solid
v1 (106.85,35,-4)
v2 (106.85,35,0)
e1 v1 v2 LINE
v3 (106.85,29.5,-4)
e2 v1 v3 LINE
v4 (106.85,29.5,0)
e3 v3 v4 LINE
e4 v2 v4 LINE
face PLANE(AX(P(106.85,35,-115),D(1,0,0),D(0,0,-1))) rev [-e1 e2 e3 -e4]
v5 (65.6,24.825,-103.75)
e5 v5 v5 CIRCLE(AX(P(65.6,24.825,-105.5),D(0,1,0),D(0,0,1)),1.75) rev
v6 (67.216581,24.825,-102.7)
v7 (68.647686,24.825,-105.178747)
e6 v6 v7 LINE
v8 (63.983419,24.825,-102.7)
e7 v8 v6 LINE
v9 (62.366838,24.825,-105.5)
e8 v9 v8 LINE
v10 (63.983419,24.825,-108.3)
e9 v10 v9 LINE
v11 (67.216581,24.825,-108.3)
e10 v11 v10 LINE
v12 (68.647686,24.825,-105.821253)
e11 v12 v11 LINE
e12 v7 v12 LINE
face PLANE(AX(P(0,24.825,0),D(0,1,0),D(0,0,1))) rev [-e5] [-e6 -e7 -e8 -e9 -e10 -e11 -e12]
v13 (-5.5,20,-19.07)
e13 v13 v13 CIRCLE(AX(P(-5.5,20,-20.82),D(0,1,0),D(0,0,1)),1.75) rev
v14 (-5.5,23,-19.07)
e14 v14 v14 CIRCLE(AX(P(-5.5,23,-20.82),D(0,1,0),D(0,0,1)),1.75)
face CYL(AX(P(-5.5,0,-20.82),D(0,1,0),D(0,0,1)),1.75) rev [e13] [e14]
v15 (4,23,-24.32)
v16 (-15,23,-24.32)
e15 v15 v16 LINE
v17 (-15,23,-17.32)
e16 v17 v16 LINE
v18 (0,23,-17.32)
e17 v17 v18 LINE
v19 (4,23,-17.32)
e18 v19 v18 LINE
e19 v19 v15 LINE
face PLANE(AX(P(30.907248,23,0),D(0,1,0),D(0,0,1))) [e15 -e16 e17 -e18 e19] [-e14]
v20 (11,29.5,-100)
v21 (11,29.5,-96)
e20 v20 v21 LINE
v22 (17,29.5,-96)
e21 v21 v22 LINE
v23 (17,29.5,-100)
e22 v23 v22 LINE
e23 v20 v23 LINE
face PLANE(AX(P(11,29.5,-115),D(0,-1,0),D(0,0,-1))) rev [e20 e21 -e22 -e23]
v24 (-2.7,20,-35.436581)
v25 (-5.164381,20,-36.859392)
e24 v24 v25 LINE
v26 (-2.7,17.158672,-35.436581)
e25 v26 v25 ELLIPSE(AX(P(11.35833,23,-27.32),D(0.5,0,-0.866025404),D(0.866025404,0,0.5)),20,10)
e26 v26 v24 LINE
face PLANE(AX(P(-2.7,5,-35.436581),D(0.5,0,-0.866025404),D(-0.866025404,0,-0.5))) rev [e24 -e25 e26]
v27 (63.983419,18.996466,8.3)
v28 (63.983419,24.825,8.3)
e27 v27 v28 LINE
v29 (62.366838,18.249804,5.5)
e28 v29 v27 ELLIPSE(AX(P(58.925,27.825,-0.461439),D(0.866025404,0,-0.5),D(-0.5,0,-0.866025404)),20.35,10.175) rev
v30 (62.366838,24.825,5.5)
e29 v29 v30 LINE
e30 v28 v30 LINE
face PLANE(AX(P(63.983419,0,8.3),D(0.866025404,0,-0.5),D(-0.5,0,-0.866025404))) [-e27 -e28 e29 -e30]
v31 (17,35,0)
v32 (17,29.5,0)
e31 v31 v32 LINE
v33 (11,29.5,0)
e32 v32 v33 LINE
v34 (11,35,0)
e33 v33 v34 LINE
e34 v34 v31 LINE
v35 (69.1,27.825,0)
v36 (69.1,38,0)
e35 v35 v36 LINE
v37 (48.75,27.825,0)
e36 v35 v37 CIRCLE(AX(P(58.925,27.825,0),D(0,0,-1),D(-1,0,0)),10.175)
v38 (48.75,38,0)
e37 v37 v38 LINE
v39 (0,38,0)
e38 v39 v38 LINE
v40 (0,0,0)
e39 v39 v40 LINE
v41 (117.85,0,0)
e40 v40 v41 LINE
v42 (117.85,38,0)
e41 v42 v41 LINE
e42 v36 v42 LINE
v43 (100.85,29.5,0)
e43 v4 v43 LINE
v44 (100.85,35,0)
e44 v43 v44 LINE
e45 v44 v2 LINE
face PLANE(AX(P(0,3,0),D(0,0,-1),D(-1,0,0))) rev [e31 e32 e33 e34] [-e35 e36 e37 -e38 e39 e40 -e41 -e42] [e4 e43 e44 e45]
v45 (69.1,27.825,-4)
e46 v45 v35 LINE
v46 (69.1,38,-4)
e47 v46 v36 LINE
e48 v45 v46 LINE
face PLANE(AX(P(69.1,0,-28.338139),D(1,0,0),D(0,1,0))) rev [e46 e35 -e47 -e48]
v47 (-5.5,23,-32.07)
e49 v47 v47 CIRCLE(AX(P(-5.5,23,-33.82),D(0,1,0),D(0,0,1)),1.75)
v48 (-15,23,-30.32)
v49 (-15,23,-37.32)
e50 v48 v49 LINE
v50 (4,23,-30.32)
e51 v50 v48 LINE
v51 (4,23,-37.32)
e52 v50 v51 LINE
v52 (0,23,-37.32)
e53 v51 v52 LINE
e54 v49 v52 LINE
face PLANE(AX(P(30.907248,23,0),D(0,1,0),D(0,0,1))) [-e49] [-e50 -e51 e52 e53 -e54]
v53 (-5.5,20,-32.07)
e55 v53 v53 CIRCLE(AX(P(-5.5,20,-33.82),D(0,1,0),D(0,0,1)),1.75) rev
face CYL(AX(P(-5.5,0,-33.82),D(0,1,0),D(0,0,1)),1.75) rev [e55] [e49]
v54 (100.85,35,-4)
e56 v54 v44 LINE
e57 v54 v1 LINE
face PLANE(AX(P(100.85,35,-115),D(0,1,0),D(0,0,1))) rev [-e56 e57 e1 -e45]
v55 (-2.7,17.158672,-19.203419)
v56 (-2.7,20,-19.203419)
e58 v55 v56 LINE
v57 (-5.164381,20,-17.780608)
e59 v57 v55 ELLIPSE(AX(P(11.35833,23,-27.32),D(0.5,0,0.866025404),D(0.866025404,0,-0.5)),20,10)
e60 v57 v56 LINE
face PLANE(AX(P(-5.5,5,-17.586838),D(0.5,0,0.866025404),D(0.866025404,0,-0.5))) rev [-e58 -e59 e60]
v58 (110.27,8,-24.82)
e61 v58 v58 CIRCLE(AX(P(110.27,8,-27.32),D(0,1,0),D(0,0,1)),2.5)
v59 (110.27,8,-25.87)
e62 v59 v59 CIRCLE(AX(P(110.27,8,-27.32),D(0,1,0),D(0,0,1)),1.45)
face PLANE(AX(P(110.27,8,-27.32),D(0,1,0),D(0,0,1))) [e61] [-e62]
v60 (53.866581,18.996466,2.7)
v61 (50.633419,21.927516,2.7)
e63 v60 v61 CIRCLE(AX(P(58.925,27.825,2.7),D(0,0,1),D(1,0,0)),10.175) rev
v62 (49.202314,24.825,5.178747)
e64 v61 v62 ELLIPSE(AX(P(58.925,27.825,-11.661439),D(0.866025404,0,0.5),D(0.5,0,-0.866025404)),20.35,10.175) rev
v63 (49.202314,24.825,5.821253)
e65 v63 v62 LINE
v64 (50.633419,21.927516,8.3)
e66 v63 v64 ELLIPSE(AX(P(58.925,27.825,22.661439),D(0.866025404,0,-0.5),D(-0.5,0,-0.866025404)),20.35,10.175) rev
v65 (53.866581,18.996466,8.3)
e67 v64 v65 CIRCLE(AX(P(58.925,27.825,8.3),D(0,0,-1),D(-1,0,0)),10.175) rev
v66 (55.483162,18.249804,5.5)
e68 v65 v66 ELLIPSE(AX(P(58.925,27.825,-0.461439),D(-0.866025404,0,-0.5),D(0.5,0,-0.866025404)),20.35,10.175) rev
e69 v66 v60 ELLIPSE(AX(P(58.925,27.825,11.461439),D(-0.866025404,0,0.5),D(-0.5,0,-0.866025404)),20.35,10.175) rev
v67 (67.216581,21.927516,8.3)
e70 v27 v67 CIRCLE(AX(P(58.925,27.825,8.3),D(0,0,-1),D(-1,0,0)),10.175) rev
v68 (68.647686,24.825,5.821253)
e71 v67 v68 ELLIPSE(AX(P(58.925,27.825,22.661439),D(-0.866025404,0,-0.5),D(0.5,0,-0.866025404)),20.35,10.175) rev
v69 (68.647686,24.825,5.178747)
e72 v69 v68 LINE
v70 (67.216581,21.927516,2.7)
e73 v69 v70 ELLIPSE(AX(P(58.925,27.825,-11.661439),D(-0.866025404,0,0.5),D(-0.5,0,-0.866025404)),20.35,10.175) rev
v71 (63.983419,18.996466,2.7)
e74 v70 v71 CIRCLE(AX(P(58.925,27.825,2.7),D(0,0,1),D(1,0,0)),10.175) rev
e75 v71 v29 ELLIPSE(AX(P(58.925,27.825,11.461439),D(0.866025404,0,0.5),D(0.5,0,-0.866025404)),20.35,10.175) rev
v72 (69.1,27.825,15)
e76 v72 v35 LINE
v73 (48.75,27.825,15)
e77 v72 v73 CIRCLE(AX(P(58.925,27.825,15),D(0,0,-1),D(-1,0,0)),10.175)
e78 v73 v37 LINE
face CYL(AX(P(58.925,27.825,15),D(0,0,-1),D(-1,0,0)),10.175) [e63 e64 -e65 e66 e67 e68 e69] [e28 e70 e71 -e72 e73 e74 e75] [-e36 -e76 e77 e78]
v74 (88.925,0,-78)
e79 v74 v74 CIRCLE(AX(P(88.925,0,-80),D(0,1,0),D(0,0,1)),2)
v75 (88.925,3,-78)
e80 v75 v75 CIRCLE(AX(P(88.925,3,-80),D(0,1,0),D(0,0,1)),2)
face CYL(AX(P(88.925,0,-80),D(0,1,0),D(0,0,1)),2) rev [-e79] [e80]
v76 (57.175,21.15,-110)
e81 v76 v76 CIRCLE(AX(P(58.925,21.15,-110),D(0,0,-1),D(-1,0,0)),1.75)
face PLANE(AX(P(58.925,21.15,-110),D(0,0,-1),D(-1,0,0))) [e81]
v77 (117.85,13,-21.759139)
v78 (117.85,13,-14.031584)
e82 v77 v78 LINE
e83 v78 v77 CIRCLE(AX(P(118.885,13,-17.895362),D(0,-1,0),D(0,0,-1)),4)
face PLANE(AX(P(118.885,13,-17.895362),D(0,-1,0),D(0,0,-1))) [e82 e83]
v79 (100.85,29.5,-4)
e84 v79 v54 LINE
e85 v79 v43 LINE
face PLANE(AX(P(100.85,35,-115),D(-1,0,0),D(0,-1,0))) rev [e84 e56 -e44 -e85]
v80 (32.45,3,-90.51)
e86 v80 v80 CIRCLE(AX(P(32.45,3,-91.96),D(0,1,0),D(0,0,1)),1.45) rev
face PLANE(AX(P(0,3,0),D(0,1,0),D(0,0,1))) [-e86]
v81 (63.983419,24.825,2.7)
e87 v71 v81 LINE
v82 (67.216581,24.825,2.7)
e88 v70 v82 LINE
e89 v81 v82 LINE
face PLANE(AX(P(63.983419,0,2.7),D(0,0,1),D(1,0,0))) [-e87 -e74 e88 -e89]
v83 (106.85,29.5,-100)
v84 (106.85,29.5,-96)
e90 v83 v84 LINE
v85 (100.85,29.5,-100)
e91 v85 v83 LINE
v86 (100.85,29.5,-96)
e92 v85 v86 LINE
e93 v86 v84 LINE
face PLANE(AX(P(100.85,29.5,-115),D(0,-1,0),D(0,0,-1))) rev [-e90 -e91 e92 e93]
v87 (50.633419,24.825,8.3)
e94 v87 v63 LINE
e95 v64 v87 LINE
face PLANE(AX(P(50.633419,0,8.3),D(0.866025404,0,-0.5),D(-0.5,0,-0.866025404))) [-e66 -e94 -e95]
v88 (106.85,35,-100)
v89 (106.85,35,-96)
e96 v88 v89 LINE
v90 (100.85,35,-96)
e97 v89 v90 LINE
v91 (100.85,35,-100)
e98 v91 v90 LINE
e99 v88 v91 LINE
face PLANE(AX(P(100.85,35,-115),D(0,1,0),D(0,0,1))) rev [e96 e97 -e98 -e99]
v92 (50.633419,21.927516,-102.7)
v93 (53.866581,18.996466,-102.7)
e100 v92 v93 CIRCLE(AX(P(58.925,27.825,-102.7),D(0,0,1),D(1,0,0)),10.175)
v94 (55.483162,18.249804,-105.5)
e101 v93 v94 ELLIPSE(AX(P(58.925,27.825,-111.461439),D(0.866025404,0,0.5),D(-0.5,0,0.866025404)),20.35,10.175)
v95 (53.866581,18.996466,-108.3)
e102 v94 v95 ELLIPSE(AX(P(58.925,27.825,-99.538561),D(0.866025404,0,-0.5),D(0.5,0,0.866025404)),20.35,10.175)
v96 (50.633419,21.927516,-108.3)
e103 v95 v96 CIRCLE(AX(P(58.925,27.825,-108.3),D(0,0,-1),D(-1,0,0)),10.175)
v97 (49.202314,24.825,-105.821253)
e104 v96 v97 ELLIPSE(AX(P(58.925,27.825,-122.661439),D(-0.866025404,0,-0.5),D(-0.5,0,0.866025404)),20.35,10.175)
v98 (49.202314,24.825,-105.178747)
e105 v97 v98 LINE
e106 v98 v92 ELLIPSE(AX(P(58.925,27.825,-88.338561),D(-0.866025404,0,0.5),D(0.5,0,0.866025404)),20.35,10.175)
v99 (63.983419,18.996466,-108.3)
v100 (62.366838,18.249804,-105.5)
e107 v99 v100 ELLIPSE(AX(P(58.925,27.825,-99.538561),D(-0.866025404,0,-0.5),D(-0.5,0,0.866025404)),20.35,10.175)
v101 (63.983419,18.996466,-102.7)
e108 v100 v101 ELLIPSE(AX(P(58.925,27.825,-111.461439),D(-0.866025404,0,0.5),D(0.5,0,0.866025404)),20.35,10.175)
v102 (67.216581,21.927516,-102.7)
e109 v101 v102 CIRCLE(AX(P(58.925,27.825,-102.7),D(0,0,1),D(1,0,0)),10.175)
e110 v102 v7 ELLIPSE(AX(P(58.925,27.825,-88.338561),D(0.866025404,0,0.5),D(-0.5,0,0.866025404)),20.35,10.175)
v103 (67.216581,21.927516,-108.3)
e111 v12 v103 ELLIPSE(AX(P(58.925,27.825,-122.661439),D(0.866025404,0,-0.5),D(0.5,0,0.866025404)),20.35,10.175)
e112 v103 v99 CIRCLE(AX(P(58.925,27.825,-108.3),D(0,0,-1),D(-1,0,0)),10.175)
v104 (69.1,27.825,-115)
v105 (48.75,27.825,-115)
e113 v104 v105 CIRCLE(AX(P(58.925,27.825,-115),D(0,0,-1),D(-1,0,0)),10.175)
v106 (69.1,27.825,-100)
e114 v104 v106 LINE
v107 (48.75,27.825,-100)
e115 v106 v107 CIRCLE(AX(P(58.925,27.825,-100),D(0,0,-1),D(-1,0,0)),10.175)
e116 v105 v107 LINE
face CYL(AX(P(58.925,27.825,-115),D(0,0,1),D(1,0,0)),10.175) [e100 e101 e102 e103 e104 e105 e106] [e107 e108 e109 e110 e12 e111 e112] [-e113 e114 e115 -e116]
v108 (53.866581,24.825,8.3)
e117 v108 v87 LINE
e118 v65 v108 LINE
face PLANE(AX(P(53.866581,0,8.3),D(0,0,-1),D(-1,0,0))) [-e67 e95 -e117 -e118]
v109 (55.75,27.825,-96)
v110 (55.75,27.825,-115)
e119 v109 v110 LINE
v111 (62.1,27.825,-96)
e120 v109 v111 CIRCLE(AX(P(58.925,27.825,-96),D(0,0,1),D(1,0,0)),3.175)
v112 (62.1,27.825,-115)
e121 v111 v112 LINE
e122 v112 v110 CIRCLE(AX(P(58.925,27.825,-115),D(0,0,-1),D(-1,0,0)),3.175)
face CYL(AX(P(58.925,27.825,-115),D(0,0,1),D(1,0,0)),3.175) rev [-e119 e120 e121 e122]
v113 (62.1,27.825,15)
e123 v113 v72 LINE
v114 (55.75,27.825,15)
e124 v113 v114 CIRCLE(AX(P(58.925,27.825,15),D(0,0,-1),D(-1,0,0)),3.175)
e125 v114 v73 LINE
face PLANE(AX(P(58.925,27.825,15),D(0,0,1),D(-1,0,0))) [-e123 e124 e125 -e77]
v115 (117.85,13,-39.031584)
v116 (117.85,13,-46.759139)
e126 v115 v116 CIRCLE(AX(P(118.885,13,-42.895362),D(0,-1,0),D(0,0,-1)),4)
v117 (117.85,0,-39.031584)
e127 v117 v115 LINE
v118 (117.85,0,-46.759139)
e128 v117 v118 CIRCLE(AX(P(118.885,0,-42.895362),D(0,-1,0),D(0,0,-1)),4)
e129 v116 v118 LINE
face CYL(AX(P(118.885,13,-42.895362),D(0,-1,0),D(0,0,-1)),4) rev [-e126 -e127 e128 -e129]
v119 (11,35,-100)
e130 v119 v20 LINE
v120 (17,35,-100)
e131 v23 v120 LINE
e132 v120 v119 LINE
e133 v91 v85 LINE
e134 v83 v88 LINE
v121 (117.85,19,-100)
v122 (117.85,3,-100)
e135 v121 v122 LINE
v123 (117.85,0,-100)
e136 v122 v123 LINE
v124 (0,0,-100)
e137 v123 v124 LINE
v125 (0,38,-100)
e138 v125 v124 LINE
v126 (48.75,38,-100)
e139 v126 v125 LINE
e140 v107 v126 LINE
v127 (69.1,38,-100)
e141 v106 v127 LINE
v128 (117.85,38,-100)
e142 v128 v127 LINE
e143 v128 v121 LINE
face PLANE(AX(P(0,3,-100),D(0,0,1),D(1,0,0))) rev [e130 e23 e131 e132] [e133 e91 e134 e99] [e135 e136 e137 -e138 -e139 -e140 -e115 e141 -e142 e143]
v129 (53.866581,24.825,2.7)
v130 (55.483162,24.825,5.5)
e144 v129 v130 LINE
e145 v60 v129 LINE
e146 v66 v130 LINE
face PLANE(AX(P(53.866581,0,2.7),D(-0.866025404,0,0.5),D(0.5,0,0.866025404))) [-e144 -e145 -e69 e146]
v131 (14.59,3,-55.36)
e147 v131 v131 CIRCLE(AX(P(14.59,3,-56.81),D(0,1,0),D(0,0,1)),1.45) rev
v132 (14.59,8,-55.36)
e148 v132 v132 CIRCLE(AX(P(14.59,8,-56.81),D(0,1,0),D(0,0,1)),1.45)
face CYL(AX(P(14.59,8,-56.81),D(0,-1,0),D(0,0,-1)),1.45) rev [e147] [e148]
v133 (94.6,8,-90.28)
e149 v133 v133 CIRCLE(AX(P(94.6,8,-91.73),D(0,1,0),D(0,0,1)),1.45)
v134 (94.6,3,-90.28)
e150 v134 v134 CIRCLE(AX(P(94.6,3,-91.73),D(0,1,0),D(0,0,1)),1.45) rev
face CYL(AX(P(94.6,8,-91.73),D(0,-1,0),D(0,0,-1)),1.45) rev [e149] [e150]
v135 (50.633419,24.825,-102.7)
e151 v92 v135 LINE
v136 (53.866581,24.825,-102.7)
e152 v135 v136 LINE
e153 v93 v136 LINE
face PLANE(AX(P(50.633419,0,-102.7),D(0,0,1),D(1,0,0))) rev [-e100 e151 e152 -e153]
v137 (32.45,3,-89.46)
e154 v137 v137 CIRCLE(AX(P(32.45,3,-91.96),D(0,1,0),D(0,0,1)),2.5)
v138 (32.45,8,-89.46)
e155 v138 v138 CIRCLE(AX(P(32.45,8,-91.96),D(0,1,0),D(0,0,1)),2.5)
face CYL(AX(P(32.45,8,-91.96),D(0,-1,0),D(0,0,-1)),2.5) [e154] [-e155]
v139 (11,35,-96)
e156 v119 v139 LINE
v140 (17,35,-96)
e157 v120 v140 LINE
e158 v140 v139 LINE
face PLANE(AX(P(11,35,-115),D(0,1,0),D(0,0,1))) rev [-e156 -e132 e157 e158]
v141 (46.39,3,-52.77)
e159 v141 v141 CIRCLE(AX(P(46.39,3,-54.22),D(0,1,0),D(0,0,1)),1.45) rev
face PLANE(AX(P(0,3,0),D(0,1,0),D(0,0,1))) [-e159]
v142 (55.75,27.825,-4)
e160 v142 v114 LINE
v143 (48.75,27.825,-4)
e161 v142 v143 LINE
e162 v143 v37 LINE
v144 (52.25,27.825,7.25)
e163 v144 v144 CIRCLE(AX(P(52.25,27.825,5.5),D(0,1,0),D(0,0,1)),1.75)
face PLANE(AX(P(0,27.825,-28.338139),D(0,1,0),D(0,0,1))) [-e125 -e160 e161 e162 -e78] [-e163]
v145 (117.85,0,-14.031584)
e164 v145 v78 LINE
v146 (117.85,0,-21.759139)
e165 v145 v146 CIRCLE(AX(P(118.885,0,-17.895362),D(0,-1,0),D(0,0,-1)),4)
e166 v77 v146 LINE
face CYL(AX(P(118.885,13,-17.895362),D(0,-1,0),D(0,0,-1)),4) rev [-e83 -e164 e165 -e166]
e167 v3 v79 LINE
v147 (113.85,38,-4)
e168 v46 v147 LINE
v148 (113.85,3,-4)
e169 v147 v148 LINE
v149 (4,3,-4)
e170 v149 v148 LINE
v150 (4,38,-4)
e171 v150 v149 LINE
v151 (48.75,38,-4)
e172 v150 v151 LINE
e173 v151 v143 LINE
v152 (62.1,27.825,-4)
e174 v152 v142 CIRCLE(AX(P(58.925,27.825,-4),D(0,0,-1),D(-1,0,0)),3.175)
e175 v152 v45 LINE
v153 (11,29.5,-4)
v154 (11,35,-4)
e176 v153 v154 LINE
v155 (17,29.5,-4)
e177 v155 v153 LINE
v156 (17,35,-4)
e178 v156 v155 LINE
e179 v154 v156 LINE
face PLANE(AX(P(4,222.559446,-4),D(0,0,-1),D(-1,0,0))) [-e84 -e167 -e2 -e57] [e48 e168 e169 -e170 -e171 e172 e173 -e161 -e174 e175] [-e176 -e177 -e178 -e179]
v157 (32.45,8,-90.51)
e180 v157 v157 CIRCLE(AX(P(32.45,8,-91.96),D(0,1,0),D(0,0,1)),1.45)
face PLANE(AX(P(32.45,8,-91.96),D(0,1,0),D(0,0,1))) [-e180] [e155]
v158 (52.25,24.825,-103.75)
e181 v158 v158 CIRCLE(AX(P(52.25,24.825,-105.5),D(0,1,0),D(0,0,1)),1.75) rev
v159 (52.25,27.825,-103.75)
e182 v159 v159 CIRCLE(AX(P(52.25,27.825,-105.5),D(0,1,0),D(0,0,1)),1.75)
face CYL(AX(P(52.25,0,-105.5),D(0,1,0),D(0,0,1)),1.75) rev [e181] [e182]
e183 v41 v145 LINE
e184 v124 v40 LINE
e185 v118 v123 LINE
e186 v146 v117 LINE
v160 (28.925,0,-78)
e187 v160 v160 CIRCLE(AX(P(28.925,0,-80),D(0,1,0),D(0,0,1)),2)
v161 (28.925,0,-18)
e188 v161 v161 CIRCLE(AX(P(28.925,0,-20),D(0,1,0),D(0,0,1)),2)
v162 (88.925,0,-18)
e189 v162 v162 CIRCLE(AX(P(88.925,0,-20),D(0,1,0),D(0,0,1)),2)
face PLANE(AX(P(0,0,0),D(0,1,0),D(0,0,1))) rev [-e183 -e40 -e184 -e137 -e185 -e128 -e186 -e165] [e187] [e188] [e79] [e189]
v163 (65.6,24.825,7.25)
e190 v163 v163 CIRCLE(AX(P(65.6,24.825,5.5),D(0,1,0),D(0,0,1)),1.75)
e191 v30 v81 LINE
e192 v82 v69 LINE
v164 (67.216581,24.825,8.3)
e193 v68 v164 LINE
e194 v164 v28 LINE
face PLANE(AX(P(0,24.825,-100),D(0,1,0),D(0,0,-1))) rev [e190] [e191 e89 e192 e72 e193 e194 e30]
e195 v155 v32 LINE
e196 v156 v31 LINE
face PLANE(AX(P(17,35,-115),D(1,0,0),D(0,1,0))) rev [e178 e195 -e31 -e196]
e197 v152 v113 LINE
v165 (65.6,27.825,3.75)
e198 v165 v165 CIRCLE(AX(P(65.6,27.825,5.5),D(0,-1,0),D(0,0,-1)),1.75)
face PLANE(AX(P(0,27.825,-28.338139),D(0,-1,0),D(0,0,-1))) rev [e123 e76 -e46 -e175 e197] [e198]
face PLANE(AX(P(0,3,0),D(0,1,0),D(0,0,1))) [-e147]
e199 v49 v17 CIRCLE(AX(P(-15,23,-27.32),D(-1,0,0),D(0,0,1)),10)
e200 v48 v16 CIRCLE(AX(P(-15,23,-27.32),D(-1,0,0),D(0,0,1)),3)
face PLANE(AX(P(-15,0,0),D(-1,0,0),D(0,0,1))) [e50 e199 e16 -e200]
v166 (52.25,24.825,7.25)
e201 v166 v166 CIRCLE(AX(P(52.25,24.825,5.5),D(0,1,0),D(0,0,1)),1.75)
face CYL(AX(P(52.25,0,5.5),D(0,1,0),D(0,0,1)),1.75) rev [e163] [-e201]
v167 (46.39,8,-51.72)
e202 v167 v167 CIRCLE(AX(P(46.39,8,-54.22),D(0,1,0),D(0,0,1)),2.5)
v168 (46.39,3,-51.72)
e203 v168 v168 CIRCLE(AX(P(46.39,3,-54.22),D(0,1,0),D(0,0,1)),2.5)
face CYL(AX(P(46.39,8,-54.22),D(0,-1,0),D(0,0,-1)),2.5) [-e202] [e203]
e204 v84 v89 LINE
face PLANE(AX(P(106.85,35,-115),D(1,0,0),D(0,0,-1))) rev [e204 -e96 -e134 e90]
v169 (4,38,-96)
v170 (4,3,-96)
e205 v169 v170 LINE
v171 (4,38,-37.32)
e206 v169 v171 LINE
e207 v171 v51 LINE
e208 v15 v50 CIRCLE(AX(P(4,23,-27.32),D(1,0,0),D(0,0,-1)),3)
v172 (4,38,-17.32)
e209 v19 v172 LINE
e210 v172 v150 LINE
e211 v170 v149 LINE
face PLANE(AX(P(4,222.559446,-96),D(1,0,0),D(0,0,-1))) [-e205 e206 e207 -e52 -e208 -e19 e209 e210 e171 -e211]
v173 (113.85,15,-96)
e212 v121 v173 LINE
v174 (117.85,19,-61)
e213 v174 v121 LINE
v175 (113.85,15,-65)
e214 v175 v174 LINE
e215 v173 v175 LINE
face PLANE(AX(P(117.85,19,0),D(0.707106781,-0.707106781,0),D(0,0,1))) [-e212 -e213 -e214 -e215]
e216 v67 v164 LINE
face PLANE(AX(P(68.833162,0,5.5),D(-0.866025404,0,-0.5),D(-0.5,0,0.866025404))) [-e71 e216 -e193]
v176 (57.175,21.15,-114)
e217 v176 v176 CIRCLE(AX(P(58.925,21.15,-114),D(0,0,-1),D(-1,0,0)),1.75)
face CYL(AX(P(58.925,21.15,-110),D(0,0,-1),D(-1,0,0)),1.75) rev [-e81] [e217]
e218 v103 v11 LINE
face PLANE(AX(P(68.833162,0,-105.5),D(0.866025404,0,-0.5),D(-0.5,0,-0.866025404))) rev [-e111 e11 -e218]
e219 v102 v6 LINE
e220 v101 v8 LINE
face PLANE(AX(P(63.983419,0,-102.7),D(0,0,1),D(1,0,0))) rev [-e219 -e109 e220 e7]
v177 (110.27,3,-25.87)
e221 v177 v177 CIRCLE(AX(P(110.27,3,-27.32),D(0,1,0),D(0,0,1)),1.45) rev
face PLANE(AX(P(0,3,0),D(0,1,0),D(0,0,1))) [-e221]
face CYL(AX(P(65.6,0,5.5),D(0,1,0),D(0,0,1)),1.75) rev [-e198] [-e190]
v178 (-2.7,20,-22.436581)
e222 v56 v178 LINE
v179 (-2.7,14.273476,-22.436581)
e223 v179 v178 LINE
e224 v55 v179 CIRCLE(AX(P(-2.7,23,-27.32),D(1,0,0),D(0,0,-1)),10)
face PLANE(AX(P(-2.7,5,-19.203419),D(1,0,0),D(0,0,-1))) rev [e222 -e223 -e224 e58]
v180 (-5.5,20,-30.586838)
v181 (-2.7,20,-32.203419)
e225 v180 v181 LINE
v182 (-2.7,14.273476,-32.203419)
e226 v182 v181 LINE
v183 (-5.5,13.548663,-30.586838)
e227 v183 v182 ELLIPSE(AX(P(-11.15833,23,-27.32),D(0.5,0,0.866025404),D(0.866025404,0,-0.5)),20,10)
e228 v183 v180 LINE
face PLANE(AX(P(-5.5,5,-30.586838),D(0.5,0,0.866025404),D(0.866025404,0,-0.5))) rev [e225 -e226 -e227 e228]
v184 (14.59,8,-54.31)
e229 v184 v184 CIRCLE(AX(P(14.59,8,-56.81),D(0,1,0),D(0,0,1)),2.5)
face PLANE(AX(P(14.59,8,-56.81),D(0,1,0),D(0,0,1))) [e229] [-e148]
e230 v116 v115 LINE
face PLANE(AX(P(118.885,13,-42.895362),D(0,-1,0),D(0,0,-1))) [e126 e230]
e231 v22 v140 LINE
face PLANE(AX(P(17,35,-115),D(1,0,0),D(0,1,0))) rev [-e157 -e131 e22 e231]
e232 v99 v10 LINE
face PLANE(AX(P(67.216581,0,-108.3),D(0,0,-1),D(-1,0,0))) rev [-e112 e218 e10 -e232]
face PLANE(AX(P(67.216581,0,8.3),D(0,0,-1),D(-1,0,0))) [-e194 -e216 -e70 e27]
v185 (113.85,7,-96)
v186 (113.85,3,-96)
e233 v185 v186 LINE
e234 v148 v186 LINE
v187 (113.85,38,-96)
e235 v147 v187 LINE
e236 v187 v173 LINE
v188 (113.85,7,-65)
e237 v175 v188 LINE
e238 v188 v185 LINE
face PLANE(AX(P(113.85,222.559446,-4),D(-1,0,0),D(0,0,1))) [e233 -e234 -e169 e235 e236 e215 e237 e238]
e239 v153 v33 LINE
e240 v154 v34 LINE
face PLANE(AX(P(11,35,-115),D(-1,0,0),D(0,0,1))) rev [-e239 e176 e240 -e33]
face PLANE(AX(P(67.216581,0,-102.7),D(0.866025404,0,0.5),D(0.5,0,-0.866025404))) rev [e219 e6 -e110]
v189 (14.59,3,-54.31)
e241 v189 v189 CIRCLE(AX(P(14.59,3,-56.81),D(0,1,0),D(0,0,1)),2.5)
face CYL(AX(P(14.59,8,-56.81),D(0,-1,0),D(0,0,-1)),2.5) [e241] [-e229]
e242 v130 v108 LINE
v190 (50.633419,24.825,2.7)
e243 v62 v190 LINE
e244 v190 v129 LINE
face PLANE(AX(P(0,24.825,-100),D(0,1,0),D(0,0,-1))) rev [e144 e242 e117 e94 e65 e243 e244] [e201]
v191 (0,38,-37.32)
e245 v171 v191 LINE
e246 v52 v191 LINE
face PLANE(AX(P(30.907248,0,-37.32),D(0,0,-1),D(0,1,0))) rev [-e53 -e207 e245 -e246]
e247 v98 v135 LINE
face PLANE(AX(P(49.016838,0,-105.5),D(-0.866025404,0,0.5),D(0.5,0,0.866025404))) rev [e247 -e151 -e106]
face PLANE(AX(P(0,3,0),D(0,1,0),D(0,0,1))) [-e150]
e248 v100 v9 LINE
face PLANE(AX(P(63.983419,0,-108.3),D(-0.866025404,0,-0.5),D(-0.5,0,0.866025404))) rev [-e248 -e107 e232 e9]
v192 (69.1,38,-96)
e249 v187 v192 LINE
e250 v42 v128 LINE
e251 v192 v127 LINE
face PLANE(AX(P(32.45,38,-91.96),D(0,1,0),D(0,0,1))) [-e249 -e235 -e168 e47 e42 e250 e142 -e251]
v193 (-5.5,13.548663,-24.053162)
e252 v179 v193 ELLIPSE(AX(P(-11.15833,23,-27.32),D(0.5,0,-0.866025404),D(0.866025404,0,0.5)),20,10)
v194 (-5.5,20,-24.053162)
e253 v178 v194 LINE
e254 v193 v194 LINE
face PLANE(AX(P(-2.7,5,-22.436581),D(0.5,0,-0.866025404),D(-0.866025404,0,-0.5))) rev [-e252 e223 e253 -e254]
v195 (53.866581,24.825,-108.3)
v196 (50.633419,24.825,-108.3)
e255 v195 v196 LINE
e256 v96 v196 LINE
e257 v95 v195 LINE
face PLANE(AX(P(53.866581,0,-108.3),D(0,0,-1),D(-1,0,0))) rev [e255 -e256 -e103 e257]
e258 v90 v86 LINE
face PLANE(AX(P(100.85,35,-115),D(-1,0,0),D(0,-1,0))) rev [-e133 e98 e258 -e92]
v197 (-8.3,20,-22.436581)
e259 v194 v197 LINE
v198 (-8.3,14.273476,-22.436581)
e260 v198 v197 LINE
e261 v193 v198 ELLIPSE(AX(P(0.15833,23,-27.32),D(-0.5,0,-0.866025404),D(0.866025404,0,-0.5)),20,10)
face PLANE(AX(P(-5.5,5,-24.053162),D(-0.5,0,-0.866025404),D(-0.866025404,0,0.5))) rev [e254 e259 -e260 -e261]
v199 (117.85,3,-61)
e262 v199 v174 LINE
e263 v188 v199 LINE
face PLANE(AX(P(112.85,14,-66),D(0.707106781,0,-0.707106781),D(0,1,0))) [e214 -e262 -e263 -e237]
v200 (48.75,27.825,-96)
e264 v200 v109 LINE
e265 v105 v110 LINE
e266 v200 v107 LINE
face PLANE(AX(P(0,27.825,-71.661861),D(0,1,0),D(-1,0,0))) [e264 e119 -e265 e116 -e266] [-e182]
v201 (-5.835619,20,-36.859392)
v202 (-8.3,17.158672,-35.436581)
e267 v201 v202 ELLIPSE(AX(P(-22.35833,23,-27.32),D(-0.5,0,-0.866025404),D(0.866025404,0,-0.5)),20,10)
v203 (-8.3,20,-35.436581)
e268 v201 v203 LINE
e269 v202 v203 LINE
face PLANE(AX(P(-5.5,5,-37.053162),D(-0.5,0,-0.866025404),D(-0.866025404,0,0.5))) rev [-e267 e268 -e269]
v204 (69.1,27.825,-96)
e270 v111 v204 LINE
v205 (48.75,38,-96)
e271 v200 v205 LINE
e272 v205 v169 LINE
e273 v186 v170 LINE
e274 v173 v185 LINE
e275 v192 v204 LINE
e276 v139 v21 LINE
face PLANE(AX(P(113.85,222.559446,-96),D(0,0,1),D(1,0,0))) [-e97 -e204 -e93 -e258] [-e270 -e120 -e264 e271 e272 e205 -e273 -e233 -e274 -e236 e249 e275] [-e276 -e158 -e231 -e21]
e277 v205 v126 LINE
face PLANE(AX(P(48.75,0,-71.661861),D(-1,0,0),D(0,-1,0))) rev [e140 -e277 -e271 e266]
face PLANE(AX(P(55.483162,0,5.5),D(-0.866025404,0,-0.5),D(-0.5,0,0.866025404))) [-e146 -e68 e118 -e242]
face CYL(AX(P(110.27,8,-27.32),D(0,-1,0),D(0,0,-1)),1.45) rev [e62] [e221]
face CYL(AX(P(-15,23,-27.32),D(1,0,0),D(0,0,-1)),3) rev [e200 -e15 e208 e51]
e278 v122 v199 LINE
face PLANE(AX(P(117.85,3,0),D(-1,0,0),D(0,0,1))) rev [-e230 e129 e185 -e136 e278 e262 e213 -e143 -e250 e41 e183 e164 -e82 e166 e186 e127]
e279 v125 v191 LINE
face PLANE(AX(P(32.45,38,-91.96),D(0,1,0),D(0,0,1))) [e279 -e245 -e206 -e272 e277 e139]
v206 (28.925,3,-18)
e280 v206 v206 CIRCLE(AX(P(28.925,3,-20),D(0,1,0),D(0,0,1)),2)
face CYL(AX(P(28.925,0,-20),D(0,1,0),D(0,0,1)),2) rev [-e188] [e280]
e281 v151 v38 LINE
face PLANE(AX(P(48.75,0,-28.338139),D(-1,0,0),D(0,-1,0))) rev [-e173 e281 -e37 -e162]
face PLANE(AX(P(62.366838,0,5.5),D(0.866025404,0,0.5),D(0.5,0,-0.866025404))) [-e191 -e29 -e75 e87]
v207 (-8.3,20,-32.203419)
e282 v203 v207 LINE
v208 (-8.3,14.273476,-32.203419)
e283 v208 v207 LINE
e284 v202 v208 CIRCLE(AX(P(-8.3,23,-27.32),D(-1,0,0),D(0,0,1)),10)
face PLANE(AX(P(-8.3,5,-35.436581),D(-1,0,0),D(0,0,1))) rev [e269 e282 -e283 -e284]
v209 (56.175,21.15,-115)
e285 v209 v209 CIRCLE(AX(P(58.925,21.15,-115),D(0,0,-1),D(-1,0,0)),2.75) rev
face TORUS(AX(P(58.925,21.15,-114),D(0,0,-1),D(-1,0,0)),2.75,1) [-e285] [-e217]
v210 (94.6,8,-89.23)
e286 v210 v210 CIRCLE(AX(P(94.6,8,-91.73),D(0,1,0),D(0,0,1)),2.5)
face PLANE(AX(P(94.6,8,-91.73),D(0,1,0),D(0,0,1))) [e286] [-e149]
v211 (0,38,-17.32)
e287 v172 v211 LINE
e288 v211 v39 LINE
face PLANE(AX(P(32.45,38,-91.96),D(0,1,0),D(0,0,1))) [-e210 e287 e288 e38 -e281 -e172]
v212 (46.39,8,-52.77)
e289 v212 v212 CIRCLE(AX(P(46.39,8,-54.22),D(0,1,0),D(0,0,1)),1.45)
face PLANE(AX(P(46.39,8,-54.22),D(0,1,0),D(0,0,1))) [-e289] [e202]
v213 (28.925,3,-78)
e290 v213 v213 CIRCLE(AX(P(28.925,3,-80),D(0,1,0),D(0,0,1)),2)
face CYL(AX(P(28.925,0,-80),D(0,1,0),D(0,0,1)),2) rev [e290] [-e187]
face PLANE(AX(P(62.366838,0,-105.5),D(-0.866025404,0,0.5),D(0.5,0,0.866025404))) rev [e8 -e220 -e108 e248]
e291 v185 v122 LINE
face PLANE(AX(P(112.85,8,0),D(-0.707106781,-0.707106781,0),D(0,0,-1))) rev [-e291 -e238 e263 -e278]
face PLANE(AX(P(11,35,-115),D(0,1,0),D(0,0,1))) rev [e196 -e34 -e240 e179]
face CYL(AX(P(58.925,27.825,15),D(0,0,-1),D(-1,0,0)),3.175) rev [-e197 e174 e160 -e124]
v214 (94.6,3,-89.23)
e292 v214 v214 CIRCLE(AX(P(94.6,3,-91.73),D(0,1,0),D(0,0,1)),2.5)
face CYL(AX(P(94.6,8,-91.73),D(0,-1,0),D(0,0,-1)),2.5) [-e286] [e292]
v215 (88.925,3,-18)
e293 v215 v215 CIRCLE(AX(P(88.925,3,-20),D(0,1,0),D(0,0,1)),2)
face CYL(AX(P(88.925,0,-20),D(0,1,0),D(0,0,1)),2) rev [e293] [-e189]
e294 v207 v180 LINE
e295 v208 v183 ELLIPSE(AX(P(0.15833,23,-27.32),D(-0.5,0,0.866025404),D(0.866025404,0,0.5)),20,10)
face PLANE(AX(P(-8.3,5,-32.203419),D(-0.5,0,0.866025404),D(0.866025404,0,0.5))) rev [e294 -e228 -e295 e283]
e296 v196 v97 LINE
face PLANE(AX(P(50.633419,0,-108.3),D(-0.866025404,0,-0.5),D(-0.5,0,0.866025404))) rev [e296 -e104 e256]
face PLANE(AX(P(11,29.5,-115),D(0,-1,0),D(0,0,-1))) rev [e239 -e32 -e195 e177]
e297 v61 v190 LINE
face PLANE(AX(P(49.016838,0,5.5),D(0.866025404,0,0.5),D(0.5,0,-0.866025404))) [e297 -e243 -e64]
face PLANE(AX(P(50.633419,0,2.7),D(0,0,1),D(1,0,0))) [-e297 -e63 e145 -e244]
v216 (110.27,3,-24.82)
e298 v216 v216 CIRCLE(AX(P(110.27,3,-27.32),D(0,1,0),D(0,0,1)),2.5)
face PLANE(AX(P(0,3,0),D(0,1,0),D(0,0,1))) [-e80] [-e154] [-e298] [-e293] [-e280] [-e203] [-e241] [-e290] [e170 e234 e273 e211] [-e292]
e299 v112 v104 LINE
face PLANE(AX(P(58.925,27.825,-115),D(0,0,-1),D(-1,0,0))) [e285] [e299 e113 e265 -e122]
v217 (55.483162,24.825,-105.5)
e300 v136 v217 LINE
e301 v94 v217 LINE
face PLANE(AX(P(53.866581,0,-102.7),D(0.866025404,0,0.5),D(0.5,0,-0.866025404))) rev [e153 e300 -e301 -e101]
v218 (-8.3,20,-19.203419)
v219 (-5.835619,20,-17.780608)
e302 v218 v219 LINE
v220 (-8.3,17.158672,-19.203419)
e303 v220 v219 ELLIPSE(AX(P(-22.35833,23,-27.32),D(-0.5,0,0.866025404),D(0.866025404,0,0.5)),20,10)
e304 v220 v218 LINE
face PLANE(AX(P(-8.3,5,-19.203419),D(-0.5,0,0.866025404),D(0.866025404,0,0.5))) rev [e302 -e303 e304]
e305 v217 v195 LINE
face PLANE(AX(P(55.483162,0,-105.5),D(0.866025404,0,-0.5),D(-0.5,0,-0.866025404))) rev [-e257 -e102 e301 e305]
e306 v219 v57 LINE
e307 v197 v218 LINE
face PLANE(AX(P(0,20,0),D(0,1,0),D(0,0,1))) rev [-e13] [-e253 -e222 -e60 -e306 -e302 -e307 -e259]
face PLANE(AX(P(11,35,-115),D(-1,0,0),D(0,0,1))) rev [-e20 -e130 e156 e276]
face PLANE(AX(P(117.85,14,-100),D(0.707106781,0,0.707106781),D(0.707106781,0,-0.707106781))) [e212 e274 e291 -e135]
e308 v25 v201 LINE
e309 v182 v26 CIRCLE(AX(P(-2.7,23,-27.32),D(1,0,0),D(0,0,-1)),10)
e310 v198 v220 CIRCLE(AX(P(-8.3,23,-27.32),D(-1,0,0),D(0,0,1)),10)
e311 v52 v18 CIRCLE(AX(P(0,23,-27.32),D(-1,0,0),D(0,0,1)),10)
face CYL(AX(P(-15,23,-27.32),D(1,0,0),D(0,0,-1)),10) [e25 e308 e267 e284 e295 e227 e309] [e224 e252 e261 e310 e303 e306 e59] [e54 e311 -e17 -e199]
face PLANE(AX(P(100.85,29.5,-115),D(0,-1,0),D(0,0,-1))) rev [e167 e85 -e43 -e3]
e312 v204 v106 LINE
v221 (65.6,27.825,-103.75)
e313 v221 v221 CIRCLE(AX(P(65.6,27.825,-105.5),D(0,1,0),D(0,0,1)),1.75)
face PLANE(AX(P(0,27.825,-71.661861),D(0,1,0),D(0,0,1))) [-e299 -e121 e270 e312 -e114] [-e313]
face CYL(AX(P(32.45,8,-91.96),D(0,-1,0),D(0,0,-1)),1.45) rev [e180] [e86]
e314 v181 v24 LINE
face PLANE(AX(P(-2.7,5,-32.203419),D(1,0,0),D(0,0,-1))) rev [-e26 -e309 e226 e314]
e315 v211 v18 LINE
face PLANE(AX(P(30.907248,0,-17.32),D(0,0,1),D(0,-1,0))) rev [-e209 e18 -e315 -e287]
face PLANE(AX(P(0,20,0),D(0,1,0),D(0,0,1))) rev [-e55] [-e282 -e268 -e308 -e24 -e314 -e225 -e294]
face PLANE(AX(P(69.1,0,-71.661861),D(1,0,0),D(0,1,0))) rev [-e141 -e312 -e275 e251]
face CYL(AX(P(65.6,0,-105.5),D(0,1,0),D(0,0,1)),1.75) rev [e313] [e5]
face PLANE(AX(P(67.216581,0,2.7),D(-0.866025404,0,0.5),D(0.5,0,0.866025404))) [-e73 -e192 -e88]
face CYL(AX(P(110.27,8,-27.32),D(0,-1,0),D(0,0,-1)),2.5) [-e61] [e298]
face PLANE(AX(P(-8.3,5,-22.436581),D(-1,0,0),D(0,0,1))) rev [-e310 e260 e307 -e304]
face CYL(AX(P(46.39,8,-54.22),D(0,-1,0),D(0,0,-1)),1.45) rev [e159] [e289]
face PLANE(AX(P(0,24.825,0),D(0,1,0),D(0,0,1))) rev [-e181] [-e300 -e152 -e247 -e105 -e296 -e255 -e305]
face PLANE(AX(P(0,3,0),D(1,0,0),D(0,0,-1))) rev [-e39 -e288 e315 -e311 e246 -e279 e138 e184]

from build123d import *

# Parameters (mm, degrees)
SKETCH1_W                = 117.85
SKETCH1_H                = 100
BOSS_EXTRUDE1_DEPTH      = 3
SKETCH2_R                = 2.5
SKETCH2_R_2              = 1.45
BOSS_EXTRUDE2_DEPTH      = 5
SKETCH3_W                = 117.85
SKETCH3_H                = 100
SKETCH3_W_2              = 109.85
SKETCH3_H_2              = 92
BOSS_EXTRUDE3_DEPTH      = 35
CUT_EXTRUDE1_DEPTH       = 6
SKETCH6_R                = 3.175
BOSS_EXTRUDE4_DEPTH      = 15
CUT_EXTRUDE2_REACH       = 170.99
SKETCH7_R                = 3.175
SKETCH8_R                = 1.75
CUT_EXTRUDE3_DEPTH       = 5
FILLET1_R                = 1
SKETCH9_R                = 1.75
CUT_EXTRUDE4_DEPTH       = 167.996566276
CUT_EXTRUDE5_DEPTH       = 167.52298084
SKETCH11_R               = 2
CUT_EXTRUDE6_DEPTH       = 169.340792807
SKETCH12_R               = 3
BOSS_EXTRUDE7_DEPTH      = 15
CUT_EXTRUDE7_REACH       = 181.772
SKETCH13_R               = 3
SKETCH14_R               = 1.75
CUT_EXTRUDE8_DEPTH       = 167.260706491
CUT_EXTRUDE9_DEPTH       = 15
CUT_EXTRUDE10_START      = -19
SKETCH16_R               = 3.175
CUT_EXTRUDE10_DEPTH      = 19
CUT_EXTRUDE11_DEPTH      = 167.293783708
CUT_EXTRUDE11_DEPTH_BACK = 167.293783708
SKETCH17_W               = 6
SKETCH17_H               = 5.5
SKETCH18_R               = 4
CUT_EXTRUDE12_DEPTH      = 13


with BuildPart() as part:
    # Sketch1 → Boss-Extrude1 (new body)
    with BuildSketch(Plane(origin=(0, 0, 0), x_dir=(1, 0, 0), z_dir=(0, 1, 0))):
        with Locations((58.925, 50)):
            Rectangle(SKETCH1_W, SKETCH1_H)
    extrude(amount=BOSS_EXTRUDE1_DEPTH)

    # Sketch2 → Boss-Extrude2 (add)
    # profile 1 of 5: a face of its own
    with BuildSketch(Plane(origin=(0, 3, 0), x_dir=(1, 0, 0), z_dir=(0, 1, 0))):
        with Locations(Location((32.45, 91.96, 0), (0, 0, 270))):
            Circle(SKETCH2_R)
        with Locations(Location((32.45, 91.96, 0), (0, 0, 270))):
            Circle(SKETCH2_R_2, mode=Mode.SUBTRACT)
    # profile 2 of 5: a face of its own
    with BuildSketch(Plane(origin=(0, 3, 0), x_dir=(1, 0, 0), z_dir=(0, 1, 0))):
        with Locations(Location((94.6, 91.73, 0), (0, 0, 270))):
            Circle(SKETCH2_R)
        with Locations(Location((94.6, 91.73, 0), (0, 0, 270))):
            Circle(SKETCH2_R_2, mode=Mode.SUBTRACT)
    # profile 3 of 5: a face of its own
    with BuildSketch(Plane(origin=(0, 3, 0), x_dir=(1, 0, 0), z_dir=(0, 1, 0))):
        with Locations(Location((14.59, 56.81, 0), (0, 0, 270))):
            Circle(SKETCH2_R)
        with Locations(Location((14.59, 56.81, 0), (0, 0, 270))):
            Circle(SKETCH2_R_2, mode=Mode.SUBTRACT)
    # profile 4 of 5: a face of its own
    with BuildSketch(Plane(origin=(0, 3, 0), x_dir=(1, 0, 0), z_dir=(0, 1, 0))):
        with Locations(Location((46.39, 54.22, 0), (0, 0, 270))):
            Circle(SKETCH2_R)
        with Locations(Location((46.39, 54.22, 0), (0, 0, 270))):
            Circle(SKETCH2_R_2, mode=Mode.SUBTRACT)
    # profile 5 of 5: a face of its own
    with BuildSketch(Plane(origin=(0, 3, 0), x_dir=(1, 0, 0), z_dir=(0, 1, 0))):
        with Locations(Location((110.27, 27.32, 0), (0, 0, 270))):
            Circle(SKETCH2_R)
        with Locations(Location((110.27, 27.32, 0), (0, 0, 270))):
            Circle(SKETCH2_R_2, mode=Mode.SUBTRACT)
    extrude(amount=BOSS_EXTRUDE2_DEPTH)

    # Sketch3 → Boss-Extrude3 (add)
    with BuildSketch(Plane(origin=(0, 3, 0), x_dir=(1, 0, 0), z_dir=(0, 1, 0))):
        with Locations((58.925, 50)):
            Rectangle(SKETCH3_W, SKETCH3_H)
        with Locations((58.925, 50)):
            Rectangle(SKETCH3_W_2, SKETCH3_H_2, mode=Mode.SUBTRACT)
    extrude(amount=BOSS_EXTRUDE3_DEPTH)

    # Sketch4 → Cut-Extrude1 (cut)
    with BuildSketch(Plane(origin=(0, 8, 0), x_dir=(1, 0, 0), z_dir=(0, 1, 0))):
        Polygon((117.85, 100), (113.85, 96), (113.85, 66), (117.85, 66), align=None)
    extrude(amount=CUT_EXTRUDE1_DEPTH, mode=Mode.SUBTRACT)

    # Chamfer1
    # the kernel refuses this chamfer: 5 mm, written as the material it takes off along each edge
    with BuildSketch(Plane(origin=(117.85, 8, -66), x_dir=(0.0274958766105877, -0.9996219169112968, 0), z_dir=(0, 0, -1))) as chamfer1_piece_1_section:
        with BuildLine():
            Line((5.143365976, 0), (-0.282735774, 5.135588968))
            Line((-0.282735774, 5.135588968), (-0.382697966, 5.13283938))
            ThreePointArc((-0.382697966, 5.13283938), (-0.170646135, 2.566989148), (-0.099962192, -0.002749588))
            Line((-0.099962192, -0.002749588), (0.002749588, -0.099962192))
            ThreePointArc((0.002749588, -0.099962192), (2.572488324, -0.029278248), (5.146115564, -0.099962192))
            Line((5.146115564, -0.099962192), (5.143365976, 0))
        make_face()
    chamfer1_piece_1 = extrude(amount=34, mode=Mode.PRIVATE)
    chamfer1_piece_1 = split(chamfer1_piece_1, bisect_by=Plane(origin=(108.149103573, 6.324982491, -90.299103573), z_dir=(0.7071067811865488, 0, 0.7071067811865462)), keep=Keep.TOP, mode=Mode.PRIVATE)
    add(chamfer1_piece_1, mode=Mode.SUBTRACT)
    with BuildSketch(Plane(origin=(117.85, 14, -66), x_dir=(0.0274958766105877, 0.9996219169112968, 0), z_dir=(0, 0, -1))) as chamfer1_piece_2_section:
        with BuildLine():
            Line((5.143365976, 0), (-0.282735774, -5.135588968))
            Line((-0.282735774, -5.135588968), (-0.382697966, -5.13283938))
            ThreePointArc((-0.382697966, -5.13283938), (-0.170646135, -2.566989148), (-0.099962192, 0.002749588))
            Line((-0.099962192, 0.002749588), (0.002749588, 0.099962192))
            ThreePointArc((0.002749588, 0.099962192), (2.572488324, 0.029278248), (5.146115564, 0.099962192))
            Line((5.146115564, 0.099962192), (5.143365976, 0))
        make_face()
    chamfer1_piece_2 = extrude(amount=34, mode=Mode.PRIVATE)
    chamfer1_piece_2 = split(chamfer1_piece_2, bisect_by=Plane(origin=(108.149103573, 15.675017509, -90.299103573), z_dir=(0.7071067811865488, 0, 0.7071067811865462)), keep=Keep.TOP, mode=Mode.PRIVATE)
    add(chamfer1_piece_2, mode=Mode.SUBTRACT)
    with BuildSketch(Plane(origin=(117.85, 8, -66), x_dir=(0.0274958766105877, 0, 0.9996219169112968), z_dir=(0, 1, 0))) as chamfer1_piece_3:
        with BuildLine():
            Line((5.143365976, 0), (-0.282735774, -5.135588968))
            Line((-0.282735774, -5.135588968), (-0.382697966, -5.13283938))
            ThreePointArc((-0.382697966, -5.13283938), (-0.170646135, -2.566989148), (-0.099962192, 0.002749588))
            Line((-0.099962192, 0.002749588), (0.002749588, 0.099962192))
            ThreePointArc((0.002749588, 0.099962192), (2.572488324, 0.029278248), (5.146115564, 0.099962192))
            Line((5.146115564, 0.099962192), (5.143365976, 0))
        make_face()
    extrude(amount=6, mode=Mode.SUBTRACT)
    with BuildSketch(Plane(origin=(117.85, -4.85841494, -66), x_dir=(0.0274958766105877, 0, 0.9996219169112968), z_dir=(0, 1, 0))) as chamfer1_piece_4a_section:
        with BuildLine():
            Line((5.143365976, 0), (-0.282735774, -5.135588968))
            Line((-0.282735774, -5.135588968), (-0.382697966, -5.13283938))
            ThreePointArc((-0.382697966, -5.13283938), (-0.170646135, -2.566989148), (-0.099962192, 0.002749588))
            Line((-0.099962192, 0.002749588), (0.002749588, 0.099962192))
            ThreePointArc((0.002749588, 0.099962192), (2.572488324, 0.029278248), (5.146115564, 0.099962192))
            Line((5.146115564, 0.099962192), (5.143365976, 0))
        make_face()
    chamfer1_piece_4a = extrude(amount=18.85841494, mode=Mode.PRIVATE)
    chamfer1_piece_4a = split(chamfer1_piece_4a, bisect_by=Plane(origin=(116.201031866, 8, -64.351031866), z_dir=(0, -1, 0)), keep=Keep.TOP, mode=Mode.PRIVATE)
    with BuildSketch(Plane(origin=(117.85, 8, -53.14158506), x_dir=(0.0274958766105877, -0.9996219169112968, 0), z_dir=(0, 0, -1))) as chamfer1_piece_4b_section:
        with BuildLine():
            Line((5.143365976, 0), (-0.282735774, 5.135588968))
            Line((-0.282735774, 5.135588968), (-0.382697966, 5.13283938))
            ThreePointArc((-0.382697966, 5.13283938), (-0.170646135, 2.566989148), (-0.099962192, -0.002749588))
            Line((-0.099962192, -0.002749588), (0.002749588, -0.099962192))
            ThreePointArc((0.002749588, -0.099962192), (2.572488324, -0.029278248), (5.146115564, -0.099962192))
            Line((5.146115564, -0.099962192), (5.143365976, 0))
        make_face()
    chamfer1_piece_4b = extrude(amount=46.85841494, mode=Mode.PRIVATE)
    chamfer1_piece_4b = split(chamfer1_piece_4b, bisect_by=Plane(origin=(116.201031866, 6.351031866, -66), z_dir=(0, 0, 1)), keep=Keep.TOP, mode=Mode.PRIVATE)
    chamfer1_piece_4 = chamfer1_piece_4a & chamfer1_piece_4b
    add(chamfer1_piece_4, mode=Mode.SUBTRACT)
    with BuildSketch(Plane(origin=(117.85, 14, -53.14158506), x_dir=(0.0274958766105877, 0.9996219169112968, 0), z_dir=(0, 0, -1))) as chamfer1_piece_5a_section:
        with BuildLine():
            Line((5.143365976, 0), (-0.282735774, -5.135588968))
            Line((-0.282735774, -5.135588968), (-0.382697966, -5.13283938))
            ThreePointArc((-0.382697966, -5.13283938), (-0.170646135, -2.566989148), (-0.099962192, 0.002749588))
            Line((-0.099962192, 0.002749588), (0.002749588, 0.099962192))
            ThreePointArc((0.002749588, 0.099962192), (2.572488324, 0.029278248), (5.146115564, 0.099962192))
            Line((5.146115564, 0.099962192), (5.143365976, 0))
        make_face()
    chamfer1_piece_5a = extrude(amount=46.85841494, mode=Mode.PRIVATE)
    chamfer1_piece_5a = split(chamfer1_piece_5a, bisect_by=Plane(origin=(116.201031866, 15.648968134, -66), z_dir=(0, 0, 1)), keep=Keep.TOP, mode=Mode.PRIVATE)
    with BuildSketch(Plane(origin=(117.85, 8, -66), x_dir=(0.0274958766105877, 0, 0.9996219169112968), z_dir=(0, 1, 0))) as chamfer1_piece_5b_section:
        with BuildLine():
            Line((5.143365976, 0), (-0.282735774, -5.135588968))
            Line((-0.282735774, -5.135588968), (-0.382697966, -5.13283938))
            ThreePointArc((-0.382697966, -5.13283938), (-0.170646135, -2.566989148), (-0.099962192, 0.002749588))
            Line((-0.099962192, 0.002749588), (0.002749588, 0.099962192))
            ThreePointArc((0.002749588, 0.099962192), (2.572488324, 0.029278248), (5.146115564, 0.099962192))
            Line((5.146115564, 0.099962192), (5.143365976, 0))
        make_face()
    chamfer1_piece_5b = extrude(amount=18.85841494, mode=Mode.PRIVATE)
    chamfer1_piece_5b = split(chamfer1_piece_5b, bisect_by=Plane(origin=(116.201031866, 14, -64.351031866), z_dir=(0, 1, 0)), keep=Keep.TOP, mode=Mode.PRIVATE)
    chamfer1_piece_5 = chamfer1_piece_5a & chamfer1_piece_5b
    add(chamfer1_piece_5, mode=Mode.SUBTRACT)

    # Sketch6 → Boss-Extrude4 (add)
    with BuildSketch(Plane(origin=(0, 0, -100), x_dir=(-1, 0, 0), z_dir=(0, 0, -1))):
        with BuildLine():
            Line((-69.1, 27.825), (-69.1, 38))
            Line((-69.1, 38), (-48.75, 38))
            Line((-48.75, 38), (-48.75, 27.825))
            ThreePointArc((-48.75, 27.825), (-58.925, 17.65), (-69.1, 27.825))
        make_face()
        with Locations((-58.925, 27.825)):
            Circle(SKETCH6_R, mode=Mode.SUBTRACT)
    boss_extrude4 = extrude(amount=BOSS_EXTRUDE4_DEPTH)

    # Cut-Extrude2: up to this face of the body (flat: up to its plane)
    cut_extrude2_end = Plane(part.part.faces().sort_by_distance((58.925, 20.5, -96))[0])
    # Sketch7 → Cut-Extrude2 (cut, up to the picked face)
    with BuildSketch(Plane(origin=(0, 0, -115), x_dir=(-1, 0, 0), z_dir=(0, 0, -1)), mode=Mode.PRIVATE) as cut_extrude2_sk1:
        with BuildLine():
            Line((-69.1, 27.825), (-62.1, 27.825))
            ThreePointArc((-62.1, 27.825), (-58.925, 31), (-55.75, 27.825))
            Line((-55.75, 27.825), (-48.75, 27.825))
            Line((-48.75, 27.825), (-48.75, 38))
            Line((-48.75, 38), (-69.1, 38))
            Line((-69.1, 38), (-69.1, 27.825))
        make_face()
    cut_extrude2_tool1 = split(extrude(cut_extrude2_sk1.sketch, amount=-CUT_EXTRUDE2_REACH, mode=Mode.PRIVATE), bisect_by=cut_extrude2_end, keep=Keep.BOTH, mode=Mode.PRIVATE)
    # Sketch7 → Cut-Extrude2 (cut, up to the picked face)
    with BuildSketch(Plane(origin=(0, 0, -115), x_dir=(-1, 0, 0), z_dir=(0, 0, -1)), mode=Mode.PRIVATE) as cut_extrude2_sk2:
        with Locations((-58.925, 27.825)):
            Circle(SKETCH7_R)
    cut_extrude2_tool2 = split(extrude(cut_extrude2_sk2.sketch, amount=-CUT_EXTRUDE2_REACH, mode=Mode.PRIVATE), bisect_by=cut_extrude2_end, keep=Keep.BOTH, mode=Mode.PRIVATE)
    add(cut_extrude2_tool1.solids().sort_by(Axis((58.925, 33.222191, -115), (0, 0, 1)))[0], mode=Mode.SUBTRACT)
    add(cut_extrude2_tool2.solids().sort_by(Axis((58.925, 27.825, -115), (0, 0, 1)))[0], mode=Mode.SUBTRACT)

    # Sketch8 → Cut-Extrude3 (cut)
    with BuildSketch(Plane(origin=(0, 0, -115), x_dir=(-1, 0, 0), z_dir=(0, 0, -1))):
        with Locations((-58.925, 21.15)):
            Circle(SKETCH8_R)
    extrude(amount=-CUT_EXTRUDE3_DEPTH, mode=Mode.SUBTRACT)

    # Fillet1
    fillet1_edges = [part.edges().sort_by_distance(p)[0] for p in [
        (60.675, 21.15, -115),
    ]]
    fillet(fillet1_edges, radius=FILLET1_R)

    # Sketch9 → Cut-Extrude4 (cut, through all)
    with BuildSketch(Plane(origin=(0, 27.825, 0), x_dir=(1, 0, 0), z_dir=(0, 1, 0))):
        with Locations(Location((52.25, 105.5, 0), (0, 0, 270))):
            Circle(SKETCH9_R)
        with Locations(Location((65.6, 105.5, 0), (0, 0, 270))):
            Circle(SKETCH9_R)
    cut_extrude4 = extrude(amount=-CUT_EXTRUDE4_DEPTH, mode=Mode.SUBTRACT)

    # Sketch10 → Cut-Extrude5 (cut, through all)
    with BuildSketch(Plane(origin=(0, 24.825, 0), x_dir=(1, 0, 0), z_dir=(0, 1, 0))):
        Polygon((55.483161507, 105.5), (53.866580754, 108.3), (50.633419246, 108.3), (49.016838493, 105.5), (50.633419246, 102.7), (53.866580754, 102.7), align=None)
        Polygon((68.833161507, 105.5), (67.216580754, 108.3), (63.983419246, 108.3), (62.366838493, 105.5), (63.983419246, 102.7), (67.216580754, 102.7), align=None)
    cut_extrude5 = extrude(amount=-CUT_EXTRUDE5_DEPTH, mode=Mode.SUBTRACT)

    # Sketch11 → Cut-Extrude6 (cut, through all)
    with BuildSketch(Plane(origin=(0, 3, 0), x_dir=(1, 0, 0), z_dir=(0, 1, 0))):
        with Locations(Location((28.925, 80, 0), (0, 0, 270))):
            Circle(SKETCH11_R)
        with Locations(Location((88.925, 80, 0), (0, 0, 270))):
            Circle(SKETCH11_R)
        with Locations(Location((28.925, 20, 0), (0, 0, 270))):
            Circle(SKETCH11_R)
        with Locations(Location((88.925, 20, 0), (0, 0, 270))):
            Circle(SKETCH11_R)
    extrude(amount=-CUT_EXTRUDE6_DEPTH, mode=Mode.SUBTRACT)

    # Sketch12 → Boss-Extrude7 (add)
    with BuildSketch(Plane.ZY):
        with BuildLine():
            Line((-37.32, 38), (-37.32, 23))
            ThreePointArc((-37.32, 23), (-27.32, 13), (-17.32, 23))
            Line((-17.32, 23), (-17.32, 38))
            Line((-17.32, 38), (-37.32, 38))
        make_face()
        with Locations((-27.32, 23)):
            Circle(SKETCH12_R, mode=Mode.SUBTRACT)
    extrude(amount=BOSS_EXTRUDE7_DEPTH)

    # Cut-Extrude7: up to this face of the body (flat: up to its plane)
    cut_extrude7_end = Plane(part.part.faces().sort_by_distance((4, 20.5, -50))[0])
    # Sketch13 → Cut-Extrude7 (cut, up to the picked face)
    with BuildSketch(Plane.ZY.offset(15), mode=Mode.PRIVATE) as cut_extrude7_sk1:
        with BuildLine():
            Line((-37.32, 23), (-30.32, 23))
            ThreePointArc((-30.32, 23), (-27.32, 26), (-24.32, 23))
            Line((-24.32, 23), (-17.32, 23))
            Line((-17.32, 23), (-17.32, 38))
            Line((-17.32, 38), (-37.32, 38))
            Line((-37.32, 38), (-37.32, 23))
        make_face()
    cut_extrude7_tool1 = split(extrude(cut_extrude7_sk1.sketch, amount=-CUT_EXTRUDE7_REACH, mode=Mode.PRIVATE), bisect_by=cut_extrude7_end, keep=Keep.BOTH, mode=Mode.PRIVATE)
    # Sketch13 → Cut-Extrude7 (cut, up to the picked face)
    with BuildSketch(Plane.ZY.offset(15), mode=Mode.PRIVATE) as cut_extrude7_sk2:
        with Locations((-27.32, 23)):
            Circle(SKETCH13_R)
    cut_extrude7_tool2 = split(extrude(cut_extrude7_sk2.sketch, amount=-CUT_EXTRUDE7_REACH, mode=Mode.PRIVATE), bisect_by=cut_extrude7_end, keep=Keep.BOTH, mode=Mode.PRIVATE)
    add(cut_extrude7_tool1.solids().sort_by(Axis((-15, 30.807941, -27.32), (1, 0, 0)))[0], mode=Mode.SUBTRACT)
    add(cut_extrude7_tool2.solids().sort_by(Axis((-15, 23, -27.32), (1, 0, 0)))[0], mode=Mode.SUBTRACT)

    # Sketch14 → Cut-Extrude8 (cut, through all)
    with BuildSketch(Plane(origin=(0, 23, 0), x_dir=(1, 0, 0), z_dir=(0, 1, 0))):
        with Locations(Location((-5.5, 33.82, 0), (0, 0, 270))):
            Circle(SKETCH14_R)
        with Locations(Location((-5.5, 20.82, 0), (0, 0, 270))):
            Circle(SKETCH14_R)
    extrude(amount=-CUT_EXTRUDE8_DEPTH, mode=Mode.SUBTRACT)

    # Sketch15 → Cut-Extrude9 (cut)
    with BuildSketch(Plane(origin=(0, 20, 0), x_dir=(1, 0, 0), z_dir=(0, 1, 0))):
        Polygon((-2.7, 32.203419246), (-2.7, 35.436580754), (-5.5, 37.053161507), (-8.3, 35.436580754), (-8.3, 32.203419246), (-5.5, 30.586838493), align=None)
        Polygon((-5.5, 24.053161507), (-8.3, 22.436580754), (-8.3, 19.203419246), (-5.5, 17.586838493), (-2.7, 19.203419246), (-2.7, 22.436580754), align=None)
    extrude(amount=-CUT_EXTRUDE9_DEPTH, mode=Mode.SUBTRACT)

    # Mirror1: Boss-Extrude4, Cut-Extrude4, Cut-Extrude5 across plane
    add(boss_extrude4.mirror(Plane.XY.offset(-50)))
    add(cut_extrude4.mirror(Plane.XY.offset(-50)), mode=Mode.SUBTRACT)
    add(cut_extrude5.mirror(Plane.XY.offset(-50)), mode=Mode.SUBTRACT)

    # Sketch16 → Cut-Extrude10 (cut)
    with BuildSketch(Plane.XY.offset(15).offset(CUT_EXTRUDE10_START)):
        with BuildLine():
            Line((48.75, 27.825), (55.75, 27.825))
            ThreePointArc((55.75, 27.825), (58.925, 31), (62.1, 27.825))
            Line((62.1, 27.825), (69.1, 27.825))
            Line((69.1, 27.825), (69.1, 38))
            Line((69.1, 38), (48.75, 38))
            Line((48.75, 38), (48.75, 27.825))
        make_face()
        with Locations((58.925, 27.825)):
            Circle(SKETCH16_R)
    extrude(amount=CUT_EXTRUDE10_DEPTH, mode=Mode.SUBTRACT)

    # Sketch17 → Cut-Extrude11 (cut, two sides: drawn at the far end of the back side and taken through both)
    with BuildSketch(Plane.XY.offset(-96).offset(-CUT_EXTRUDE11_DEPTH_BACK)):
        with Locations((14, 32.25)):
            Rectangle(SKETCH17_W, SKETCH17_H)
        with Locations((103.85, 32.25)):
            Rectangle(SKETCH17_W, SKETCH17_H)
    extrude(amount=CUT_EXTRUDE11_DEPTH + CUT_EXTRUDE11_DEPTH_BACK, mode=Mode.SUBTRACT)

    # Sketch18 → Cut-Extrude12 (cut)
    with BuildSketch(Plane.XZ):
        with Locations((118.885, -42.895361561)):
            Circle(SKETCH18_R)
        with Locations((118.885, -17.895361561)):
            Circle(SKETCH18_R)
    extrude(amount=-CUT_EXTRUDE12_DEPTH, mode=Mode.SUBTRACT)


solid = part.part
